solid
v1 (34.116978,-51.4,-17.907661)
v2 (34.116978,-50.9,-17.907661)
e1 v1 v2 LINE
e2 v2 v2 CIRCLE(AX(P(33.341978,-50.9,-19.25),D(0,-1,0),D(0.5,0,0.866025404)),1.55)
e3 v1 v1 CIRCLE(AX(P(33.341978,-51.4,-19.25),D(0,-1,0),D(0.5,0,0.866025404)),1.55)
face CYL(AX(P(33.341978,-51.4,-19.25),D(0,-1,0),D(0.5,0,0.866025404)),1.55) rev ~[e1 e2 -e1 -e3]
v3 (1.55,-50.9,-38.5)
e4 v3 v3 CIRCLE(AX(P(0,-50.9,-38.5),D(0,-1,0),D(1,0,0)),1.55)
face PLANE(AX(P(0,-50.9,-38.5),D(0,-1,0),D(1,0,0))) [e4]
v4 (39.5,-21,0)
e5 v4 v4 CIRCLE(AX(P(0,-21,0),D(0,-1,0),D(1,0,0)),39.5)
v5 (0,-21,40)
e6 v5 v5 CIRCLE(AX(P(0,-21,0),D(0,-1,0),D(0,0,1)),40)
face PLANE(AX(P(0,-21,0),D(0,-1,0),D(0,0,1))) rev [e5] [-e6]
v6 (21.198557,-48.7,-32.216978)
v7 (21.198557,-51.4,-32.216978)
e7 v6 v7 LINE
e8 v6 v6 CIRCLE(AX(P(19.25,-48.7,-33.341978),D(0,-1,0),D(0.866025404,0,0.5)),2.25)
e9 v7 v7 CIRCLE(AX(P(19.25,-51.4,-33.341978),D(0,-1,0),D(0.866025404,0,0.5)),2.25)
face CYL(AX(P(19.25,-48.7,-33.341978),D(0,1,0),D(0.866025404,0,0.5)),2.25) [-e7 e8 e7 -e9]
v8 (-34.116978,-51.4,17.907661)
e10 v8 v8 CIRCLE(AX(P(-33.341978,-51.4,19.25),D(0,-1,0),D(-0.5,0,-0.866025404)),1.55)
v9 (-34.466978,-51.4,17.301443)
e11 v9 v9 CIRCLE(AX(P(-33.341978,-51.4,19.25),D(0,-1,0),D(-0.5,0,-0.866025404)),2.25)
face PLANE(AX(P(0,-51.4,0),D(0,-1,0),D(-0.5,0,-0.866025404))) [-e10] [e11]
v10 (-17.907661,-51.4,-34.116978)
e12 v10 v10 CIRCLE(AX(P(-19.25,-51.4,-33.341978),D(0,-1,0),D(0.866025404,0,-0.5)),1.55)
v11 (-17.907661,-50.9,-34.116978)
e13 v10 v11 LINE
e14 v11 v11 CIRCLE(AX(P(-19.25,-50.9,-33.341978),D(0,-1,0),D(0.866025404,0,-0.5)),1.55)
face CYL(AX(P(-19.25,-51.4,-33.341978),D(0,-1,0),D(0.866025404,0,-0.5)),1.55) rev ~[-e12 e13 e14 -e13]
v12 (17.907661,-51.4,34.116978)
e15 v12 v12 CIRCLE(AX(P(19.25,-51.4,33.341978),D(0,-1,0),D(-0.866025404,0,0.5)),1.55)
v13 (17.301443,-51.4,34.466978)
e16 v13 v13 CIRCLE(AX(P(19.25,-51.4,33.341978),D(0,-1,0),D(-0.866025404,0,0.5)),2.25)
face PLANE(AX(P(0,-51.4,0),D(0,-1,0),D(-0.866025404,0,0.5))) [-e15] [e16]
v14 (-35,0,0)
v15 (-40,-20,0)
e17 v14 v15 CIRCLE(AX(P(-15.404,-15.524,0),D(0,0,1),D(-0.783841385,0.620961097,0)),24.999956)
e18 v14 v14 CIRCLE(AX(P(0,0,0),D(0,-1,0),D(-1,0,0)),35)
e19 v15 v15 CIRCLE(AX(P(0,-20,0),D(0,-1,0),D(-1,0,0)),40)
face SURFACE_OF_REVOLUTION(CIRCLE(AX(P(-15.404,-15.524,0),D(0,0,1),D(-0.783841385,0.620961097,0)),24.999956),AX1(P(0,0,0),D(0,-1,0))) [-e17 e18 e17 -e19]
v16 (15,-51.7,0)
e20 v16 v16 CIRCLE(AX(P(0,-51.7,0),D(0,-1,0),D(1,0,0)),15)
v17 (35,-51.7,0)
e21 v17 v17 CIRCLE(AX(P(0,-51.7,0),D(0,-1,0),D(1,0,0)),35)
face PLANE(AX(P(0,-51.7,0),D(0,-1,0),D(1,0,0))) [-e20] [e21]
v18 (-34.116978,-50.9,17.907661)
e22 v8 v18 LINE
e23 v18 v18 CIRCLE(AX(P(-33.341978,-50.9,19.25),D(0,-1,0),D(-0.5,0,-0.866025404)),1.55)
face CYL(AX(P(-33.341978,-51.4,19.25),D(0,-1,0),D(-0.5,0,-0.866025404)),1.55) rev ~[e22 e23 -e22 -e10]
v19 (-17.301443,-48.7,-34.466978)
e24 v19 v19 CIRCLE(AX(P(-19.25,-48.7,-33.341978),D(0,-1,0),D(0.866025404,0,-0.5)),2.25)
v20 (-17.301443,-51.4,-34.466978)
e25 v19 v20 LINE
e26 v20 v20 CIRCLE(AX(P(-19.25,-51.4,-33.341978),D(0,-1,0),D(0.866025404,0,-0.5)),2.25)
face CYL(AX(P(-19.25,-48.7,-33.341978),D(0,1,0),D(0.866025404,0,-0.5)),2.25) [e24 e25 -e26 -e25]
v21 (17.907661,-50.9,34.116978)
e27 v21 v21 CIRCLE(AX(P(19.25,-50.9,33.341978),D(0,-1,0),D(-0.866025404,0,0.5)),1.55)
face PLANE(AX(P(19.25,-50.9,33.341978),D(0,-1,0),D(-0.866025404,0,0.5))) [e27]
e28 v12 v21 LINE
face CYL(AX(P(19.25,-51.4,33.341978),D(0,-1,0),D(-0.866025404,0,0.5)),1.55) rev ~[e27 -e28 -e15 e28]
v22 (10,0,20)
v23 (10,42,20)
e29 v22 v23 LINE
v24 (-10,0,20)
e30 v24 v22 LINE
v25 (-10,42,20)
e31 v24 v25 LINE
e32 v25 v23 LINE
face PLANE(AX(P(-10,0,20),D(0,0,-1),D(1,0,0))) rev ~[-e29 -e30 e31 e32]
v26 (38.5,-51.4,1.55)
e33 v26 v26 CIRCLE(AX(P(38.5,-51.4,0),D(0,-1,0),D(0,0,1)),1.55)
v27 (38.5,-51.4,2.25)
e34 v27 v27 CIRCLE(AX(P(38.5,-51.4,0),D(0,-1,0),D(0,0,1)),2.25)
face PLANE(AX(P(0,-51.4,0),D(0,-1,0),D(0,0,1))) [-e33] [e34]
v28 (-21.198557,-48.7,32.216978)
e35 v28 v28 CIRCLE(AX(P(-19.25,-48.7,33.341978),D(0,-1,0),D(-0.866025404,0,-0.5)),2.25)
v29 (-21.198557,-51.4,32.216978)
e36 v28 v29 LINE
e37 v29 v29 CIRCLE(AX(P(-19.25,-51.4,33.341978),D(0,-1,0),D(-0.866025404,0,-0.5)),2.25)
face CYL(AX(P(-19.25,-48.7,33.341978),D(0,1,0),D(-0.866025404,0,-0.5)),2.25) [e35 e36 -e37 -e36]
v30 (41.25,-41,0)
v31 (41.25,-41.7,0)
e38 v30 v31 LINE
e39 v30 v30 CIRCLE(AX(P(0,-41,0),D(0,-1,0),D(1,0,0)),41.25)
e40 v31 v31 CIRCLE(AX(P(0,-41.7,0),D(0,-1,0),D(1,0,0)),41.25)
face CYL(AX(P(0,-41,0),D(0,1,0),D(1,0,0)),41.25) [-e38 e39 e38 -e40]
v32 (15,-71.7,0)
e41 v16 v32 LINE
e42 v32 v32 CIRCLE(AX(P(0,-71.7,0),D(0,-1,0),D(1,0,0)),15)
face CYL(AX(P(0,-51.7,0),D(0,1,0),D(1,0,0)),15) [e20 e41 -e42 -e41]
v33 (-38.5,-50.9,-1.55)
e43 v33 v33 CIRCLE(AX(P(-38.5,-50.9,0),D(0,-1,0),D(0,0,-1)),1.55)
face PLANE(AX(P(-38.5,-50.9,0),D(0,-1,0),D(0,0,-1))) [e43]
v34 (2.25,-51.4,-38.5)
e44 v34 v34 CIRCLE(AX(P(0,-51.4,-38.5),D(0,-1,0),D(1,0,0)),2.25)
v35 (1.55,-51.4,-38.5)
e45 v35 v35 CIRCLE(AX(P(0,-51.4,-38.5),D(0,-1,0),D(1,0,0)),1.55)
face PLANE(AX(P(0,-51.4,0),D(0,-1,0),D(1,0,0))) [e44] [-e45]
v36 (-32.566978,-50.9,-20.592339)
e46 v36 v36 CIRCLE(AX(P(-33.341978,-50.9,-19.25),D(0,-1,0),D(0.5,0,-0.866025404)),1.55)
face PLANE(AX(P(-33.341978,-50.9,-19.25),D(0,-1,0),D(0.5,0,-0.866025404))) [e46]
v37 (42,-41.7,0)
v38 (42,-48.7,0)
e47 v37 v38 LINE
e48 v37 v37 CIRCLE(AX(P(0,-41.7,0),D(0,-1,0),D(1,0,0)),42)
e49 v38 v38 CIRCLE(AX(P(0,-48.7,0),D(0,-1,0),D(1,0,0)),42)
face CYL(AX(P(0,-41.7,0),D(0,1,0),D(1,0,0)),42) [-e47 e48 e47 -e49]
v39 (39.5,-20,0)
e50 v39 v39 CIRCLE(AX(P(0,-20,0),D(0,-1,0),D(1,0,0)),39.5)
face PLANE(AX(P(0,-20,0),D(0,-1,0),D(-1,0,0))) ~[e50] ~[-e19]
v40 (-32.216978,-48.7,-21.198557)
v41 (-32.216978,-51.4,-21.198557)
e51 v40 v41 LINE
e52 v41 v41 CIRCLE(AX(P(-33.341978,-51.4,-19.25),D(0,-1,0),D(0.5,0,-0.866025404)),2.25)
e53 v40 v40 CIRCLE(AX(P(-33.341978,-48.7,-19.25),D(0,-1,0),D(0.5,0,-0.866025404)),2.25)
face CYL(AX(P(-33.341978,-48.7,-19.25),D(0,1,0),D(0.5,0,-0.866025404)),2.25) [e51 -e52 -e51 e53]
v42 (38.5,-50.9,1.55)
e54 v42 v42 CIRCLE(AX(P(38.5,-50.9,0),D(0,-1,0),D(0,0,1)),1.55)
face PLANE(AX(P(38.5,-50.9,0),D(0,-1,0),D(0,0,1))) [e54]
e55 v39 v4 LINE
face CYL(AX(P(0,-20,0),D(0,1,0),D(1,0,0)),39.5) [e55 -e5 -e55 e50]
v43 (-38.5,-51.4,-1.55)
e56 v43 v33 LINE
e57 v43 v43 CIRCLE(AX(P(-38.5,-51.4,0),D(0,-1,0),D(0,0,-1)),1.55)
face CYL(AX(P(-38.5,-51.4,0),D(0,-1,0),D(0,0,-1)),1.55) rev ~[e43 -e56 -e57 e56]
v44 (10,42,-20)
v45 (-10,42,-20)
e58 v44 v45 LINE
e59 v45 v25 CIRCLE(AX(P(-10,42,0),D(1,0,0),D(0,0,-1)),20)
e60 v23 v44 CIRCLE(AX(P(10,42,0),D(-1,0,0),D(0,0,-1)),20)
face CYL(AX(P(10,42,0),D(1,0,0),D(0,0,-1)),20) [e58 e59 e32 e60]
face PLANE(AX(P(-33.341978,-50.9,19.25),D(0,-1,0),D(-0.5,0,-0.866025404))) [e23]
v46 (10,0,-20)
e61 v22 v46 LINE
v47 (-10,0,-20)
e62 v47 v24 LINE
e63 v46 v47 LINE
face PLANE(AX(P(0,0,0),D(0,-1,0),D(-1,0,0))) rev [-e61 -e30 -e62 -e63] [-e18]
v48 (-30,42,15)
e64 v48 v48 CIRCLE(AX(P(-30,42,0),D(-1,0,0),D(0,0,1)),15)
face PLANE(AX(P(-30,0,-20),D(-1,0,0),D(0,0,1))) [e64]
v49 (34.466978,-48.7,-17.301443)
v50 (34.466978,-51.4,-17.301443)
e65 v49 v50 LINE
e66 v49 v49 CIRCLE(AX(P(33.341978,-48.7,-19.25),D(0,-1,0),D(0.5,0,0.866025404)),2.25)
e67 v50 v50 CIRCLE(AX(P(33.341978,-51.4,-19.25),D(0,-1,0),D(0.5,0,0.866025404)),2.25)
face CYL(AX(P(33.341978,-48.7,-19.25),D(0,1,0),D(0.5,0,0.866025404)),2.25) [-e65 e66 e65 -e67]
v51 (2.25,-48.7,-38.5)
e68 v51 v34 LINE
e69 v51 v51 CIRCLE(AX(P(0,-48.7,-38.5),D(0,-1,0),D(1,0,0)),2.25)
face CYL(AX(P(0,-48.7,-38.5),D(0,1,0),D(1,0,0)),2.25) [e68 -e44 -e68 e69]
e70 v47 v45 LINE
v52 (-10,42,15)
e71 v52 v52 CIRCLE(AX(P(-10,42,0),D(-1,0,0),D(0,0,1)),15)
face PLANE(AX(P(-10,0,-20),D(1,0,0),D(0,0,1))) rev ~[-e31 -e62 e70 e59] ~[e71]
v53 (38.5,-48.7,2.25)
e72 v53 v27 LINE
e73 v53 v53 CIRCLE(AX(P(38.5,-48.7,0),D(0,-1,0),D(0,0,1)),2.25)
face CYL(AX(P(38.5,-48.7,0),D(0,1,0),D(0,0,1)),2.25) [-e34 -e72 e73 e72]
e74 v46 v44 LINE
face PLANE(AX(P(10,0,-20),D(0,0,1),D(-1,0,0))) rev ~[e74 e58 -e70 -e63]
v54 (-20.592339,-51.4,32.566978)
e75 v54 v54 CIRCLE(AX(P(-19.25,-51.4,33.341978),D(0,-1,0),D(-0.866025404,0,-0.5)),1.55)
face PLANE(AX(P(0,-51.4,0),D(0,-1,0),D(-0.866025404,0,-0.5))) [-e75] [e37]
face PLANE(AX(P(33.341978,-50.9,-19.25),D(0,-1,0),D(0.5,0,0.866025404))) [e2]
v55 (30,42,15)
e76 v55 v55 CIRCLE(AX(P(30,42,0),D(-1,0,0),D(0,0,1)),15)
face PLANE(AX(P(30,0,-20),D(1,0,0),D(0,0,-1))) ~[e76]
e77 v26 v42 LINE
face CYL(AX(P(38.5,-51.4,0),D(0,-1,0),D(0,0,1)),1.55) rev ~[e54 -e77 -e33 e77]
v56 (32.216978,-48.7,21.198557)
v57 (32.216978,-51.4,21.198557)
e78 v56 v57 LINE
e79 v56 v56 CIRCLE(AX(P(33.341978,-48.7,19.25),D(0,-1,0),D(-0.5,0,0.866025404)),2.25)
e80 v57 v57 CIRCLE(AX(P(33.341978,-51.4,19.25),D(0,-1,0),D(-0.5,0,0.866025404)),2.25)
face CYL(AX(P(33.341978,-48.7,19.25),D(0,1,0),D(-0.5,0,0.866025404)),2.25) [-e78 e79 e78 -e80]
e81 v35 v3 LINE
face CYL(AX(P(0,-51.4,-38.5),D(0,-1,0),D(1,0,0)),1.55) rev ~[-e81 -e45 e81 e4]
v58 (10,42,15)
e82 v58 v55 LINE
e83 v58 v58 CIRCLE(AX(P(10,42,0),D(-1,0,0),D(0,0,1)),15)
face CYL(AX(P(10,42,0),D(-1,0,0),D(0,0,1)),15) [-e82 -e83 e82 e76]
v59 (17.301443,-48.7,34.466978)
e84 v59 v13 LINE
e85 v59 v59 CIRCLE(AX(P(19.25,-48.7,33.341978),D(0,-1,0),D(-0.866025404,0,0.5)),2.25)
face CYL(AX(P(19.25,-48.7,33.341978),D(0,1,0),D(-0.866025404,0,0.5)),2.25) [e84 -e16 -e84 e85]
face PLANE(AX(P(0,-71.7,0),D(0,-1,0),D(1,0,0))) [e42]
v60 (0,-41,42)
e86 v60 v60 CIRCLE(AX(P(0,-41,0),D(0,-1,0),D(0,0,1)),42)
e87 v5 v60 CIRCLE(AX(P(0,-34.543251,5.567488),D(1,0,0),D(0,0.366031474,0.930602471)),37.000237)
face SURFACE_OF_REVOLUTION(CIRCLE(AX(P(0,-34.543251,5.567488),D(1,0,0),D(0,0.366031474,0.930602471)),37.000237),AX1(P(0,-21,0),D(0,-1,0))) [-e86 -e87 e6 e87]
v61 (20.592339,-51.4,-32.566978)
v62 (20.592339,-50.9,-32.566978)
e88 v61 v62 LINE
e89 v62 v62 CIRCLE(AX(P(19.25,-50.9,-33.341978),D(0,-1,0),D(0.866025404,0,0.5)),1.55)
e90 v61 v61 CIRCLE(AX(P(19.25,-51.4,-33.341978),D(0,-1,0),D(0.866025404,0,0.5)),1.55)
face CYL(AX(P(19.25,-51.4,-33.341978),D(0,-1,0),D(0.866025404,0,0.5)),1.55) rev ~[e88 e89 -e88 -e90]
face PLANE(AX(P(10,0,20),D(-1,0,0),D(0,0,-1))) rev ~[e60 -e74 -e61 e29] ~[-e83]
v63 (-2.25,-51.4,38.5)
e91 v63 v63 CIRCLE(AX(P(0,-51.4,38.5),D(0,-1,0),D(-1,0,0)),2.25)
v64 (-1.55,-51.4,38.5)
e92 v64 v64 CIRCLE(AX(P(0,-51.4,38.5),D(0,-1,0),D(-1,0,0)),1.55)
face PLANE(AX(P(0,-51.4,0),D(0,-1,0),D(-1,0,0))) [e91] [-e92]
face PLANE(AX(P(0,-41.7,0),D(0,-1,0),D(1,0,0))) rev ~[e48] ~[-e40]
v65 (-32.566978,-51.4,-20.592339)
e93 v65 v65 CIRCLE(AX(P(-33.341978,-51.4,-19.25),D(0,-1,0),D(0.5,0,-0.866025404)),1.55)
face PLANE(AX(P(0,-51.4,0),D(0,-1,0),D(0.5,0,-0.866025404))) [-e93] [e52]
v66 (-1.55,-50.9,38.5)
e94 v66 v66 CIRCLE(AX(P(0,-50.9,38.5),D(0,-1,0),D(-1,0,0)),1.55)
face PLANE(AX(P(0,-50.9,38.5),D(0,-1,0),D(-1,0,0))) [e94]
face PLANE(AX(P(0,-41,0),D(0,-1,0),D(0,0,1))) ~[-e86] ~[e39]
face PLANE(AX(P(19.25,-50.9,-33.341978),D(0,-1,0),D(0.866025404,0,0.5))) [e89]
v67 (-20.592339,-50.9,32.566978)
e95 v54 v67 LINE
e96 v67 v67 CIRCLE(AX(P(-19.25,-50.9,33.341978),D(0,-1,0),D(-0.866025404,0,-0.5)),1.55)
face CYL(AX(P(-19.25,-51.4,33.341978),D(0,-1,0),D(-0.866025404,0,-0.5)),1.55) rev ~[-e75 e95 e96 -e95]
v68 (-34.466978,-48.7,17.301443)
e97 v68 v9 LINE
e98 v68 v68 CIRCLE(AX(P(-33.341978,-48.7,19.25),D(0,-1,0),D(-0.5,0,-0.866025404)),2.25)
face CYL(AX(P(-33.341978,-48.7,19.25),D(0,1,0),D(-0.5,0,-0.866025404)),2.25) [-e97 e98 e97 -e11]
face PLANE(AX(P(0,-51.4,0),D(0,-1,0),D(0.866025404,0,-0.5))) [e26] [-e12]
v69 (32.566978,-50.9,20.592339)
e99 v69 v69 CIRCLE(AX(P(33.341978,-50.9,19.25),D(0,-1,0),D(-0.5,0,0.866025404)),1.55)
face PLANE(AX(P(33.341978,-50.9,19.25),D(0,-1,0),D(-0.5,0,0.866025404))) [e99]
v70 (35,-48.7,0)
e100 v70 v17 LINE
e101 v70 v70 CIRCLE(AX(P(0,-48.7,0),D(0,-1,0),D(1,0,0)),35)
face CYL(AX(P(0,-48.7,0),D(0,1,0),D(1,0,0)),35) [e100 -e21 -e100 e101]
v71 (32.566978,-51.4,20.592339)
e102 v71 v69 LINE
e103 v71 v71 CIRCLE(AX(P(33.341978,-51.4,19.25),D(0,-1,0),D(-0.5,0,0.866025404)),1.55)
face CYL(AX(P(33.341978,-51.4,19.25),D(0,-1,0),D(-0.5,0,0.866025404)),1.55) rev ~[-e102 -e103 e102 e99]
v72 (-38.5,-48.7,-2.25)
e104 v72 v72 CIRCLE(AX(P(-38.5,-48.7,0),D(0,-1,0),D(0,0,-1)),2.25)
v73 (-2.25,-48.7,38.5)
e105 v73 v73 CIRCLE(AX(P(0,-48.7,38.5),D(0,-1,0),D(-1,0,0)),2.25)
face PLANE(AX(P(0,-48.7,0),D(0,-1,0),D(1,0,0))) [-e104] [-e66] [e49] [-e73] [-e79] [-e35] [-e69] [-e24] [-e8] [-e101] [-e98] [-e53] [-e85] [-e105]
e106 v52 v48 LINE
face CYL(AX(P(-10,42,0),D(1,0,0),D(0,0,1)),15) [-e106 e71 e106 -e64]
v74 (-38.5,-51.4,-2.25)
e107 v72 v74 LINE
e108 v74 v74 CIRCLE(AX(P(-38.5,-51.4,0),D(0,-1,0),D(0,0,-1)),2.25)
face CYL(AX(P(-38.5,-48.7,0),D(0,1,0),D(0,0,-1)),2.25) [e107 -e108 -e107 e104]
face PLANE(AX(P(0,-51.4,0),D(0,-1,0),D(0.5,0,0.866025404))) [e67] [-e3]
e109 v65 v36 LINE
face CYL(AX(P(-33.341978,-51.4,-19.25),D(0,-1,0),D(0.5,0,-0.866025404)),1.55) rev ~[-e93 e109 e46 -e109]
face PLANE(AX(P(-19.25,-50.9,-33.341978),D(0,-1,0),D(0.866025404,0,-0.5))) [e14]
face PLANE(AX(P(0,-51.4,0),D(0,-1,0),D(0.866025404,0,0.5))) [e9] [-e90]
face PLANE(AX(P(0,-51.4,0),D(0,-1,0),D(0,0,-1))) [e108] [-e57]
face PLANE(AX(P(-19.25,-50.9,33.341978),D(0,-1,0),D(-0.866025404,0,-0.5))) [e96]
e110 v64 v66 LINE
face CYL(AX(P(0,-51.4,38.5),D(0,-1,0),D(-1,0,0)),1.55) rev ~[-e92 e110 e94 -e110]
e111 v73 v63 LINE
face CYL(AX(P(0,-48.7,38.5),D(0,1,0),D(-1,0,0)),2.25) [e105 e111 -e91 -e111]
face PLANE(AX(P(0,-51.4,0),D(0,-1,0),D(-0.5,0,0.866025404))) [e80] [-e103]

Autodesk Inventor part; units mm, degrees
ref_plane "YZ Plane" through (0, 0, 0) normal (1, 0, 0) x (0, 1, 0)
ref_plane "XZ Plane" through (0, 0, 0) normal (0, 1, 0) x (-1, 0, 0)
ref_plane "XY Plane" through (0, 0, 0) normal (0, 0, 1) x (1, 0, 0)
sketch "Sketch1" plane through (0, 0, 0) normal (0, 0, 1) x (1, 0, 0)
  line L0 (0, 0) -> (-35, 0)
  line L1 (0, 0) -> (0, -20)
  line L2 (0, -20) -> (-40, -20)
  arc A0 (-35, 0) -> (-40, -20) centre (-15.404, -15.524) ccw
  dimension "d0" = 35
  dimension "d1" = 20
  dimension "d2" = 40
  dimension "d3" = 25
revolve "Revolution1" add sketch "Sketch1" angle 360 about axis through (0, 0, 0) along (0, -1, 0)
sketch "Sketch2" plane through (0, -20, 0) normal (0, -1, 0) x (1, 0, 0)
  circle A0 centre (0, 0) radius 39.5
  dimension "d5" = 79
extrude "Extrusion1" add sketch "Sketch2" along normal blind 1
sketch "Sketch3" plane through (0, 0, 0) normal (1, 0, 0) x (0, 1, 0)
  line L0 (-21, 39.5) -> (-21, -39.5) projected
  line L1 (-21, 0) -> (-21, 40)
  line L2 (-21, 0) -> (-41, 0)
  line L3 (-41, 0) -> (-41, 42)
  arc A0 (-21, 40) -> (-41, 42) centre (-34.5432, 5.5677) ccw
  point P0 (0, 0)
  dimension "d8" = 40
  dimension "d9" = 20
  dimension "d10" = 42
  dimension "d11" = 37
revolve "Revolution2" add sketch "Sketch3" angle 360 about axis through (0, -21, 0) along (0, -1, 0)
sketch "Sketch4" plane through (0, -41, 0) normal (0, -1, 0) x (1, 0, 0)
  circle A0 centre (0, 0) radius 41.25
  dimension "d13" = 82.5
extrude "Extrusion2" add sketch "Sketch4" along normal blind 0.7
sketch "Sketch5" plane through (0, -41.7, 0) normal (0, -1, 0) x (1, 0, 0)
  circle A0 centre (0, 0) radius 42
  dimension "d16" = 84
extrude "Extrusion3" add sketch "Sketch5" along normal blind 7
sketch "Sketch6" plane through (0, -48.7, 0) normal (0, -1, 0) x (1, 0, 0)
  circle A0 centre (0, 0) radius 35
  dimension "d19" = 70
extrude "Extrusion4" add sketch "Sketch6" along normal blind 3
sketch "Sketch7" plane through (0, -48.7, 0) normal (0, -1, 0) x (1, 0, 0)
  circle A0 centre (0, 0) radius 35 construction
  line L0 (0, -35) -> (0, -42) construction
  circle A1 centre (0, 0) radius 42 construction
  circle A2 centre (0, -38.5) radius 2.25
  dimension "d22" = 4.5
extrude "Extrusion5" add sketch "Sketch7" along normal blind 2.7
sketch "Sketch8" plane through (0, -51.4, -38.5) normal (0, -1, 0) x (1, 0, 0)
  circle A0 centre (0, 0) radius 2.25 projected
  circle A1 centre (0, 0) radius 1.55
  point P0 (0, 38.5)
  dimension "d25" = 0.7
extrude "Extrusion6" cut sketch "Sketch8" against normal blind 0.5 contours A1
pattern_circular "Circular Pattern1" count 12 over 360 about axis through (0, -48.7, 0) along (0, -1, 0) of "Extrusion5", "Extrusion6"
sketch "Sketch9" plane through (0, 0, 0) normal (0, 1, 0) x (1, 0, 0)
  line L0 (-10, -20) -> (10, -20)
  line L1 (10, -20) -> (10, 20)
  line L2 (10, 20) -> (-10, 20)
  line L3 (-10, 20) -> (-10, -20)
  line L4 (-10, -20) -> (10, 20) construction
  line L5 (10, -20) -> (-10, 20) construction
  point P0 (0, 0)
  dimension "d31" = 20
  dimension "d32" = 40
extrude "Extrusion7" add sketch "Sketch9" along normal blind 42
sketch "Sketch10" plane through (10, 0, 20) normal (1, 0, 0) x (0, 0, -1)
  line L0 (0, 42) -> (40, 42) projected
  circle A0 centre (20, 42) radius 20
  point P0 (20, 0)
extrude "Extrusion8" add sketch "Sketch10" against normal up to surface (20 mm away)
sketch "Sketch11" plane through (-10, 0, -20) normal (-1, 0, 0) x (0, 0, 1)
  arc A0 (40, 42) -> (0, 42) centre (20, 42) ccw projected
  circle A1 centre (20, 42) radius 15
  point P0 (20, 0)
  dimension "d37" = 30
extrude "Extrusion9" add sketch "Sketch11" along normal blind 20
mirror "Mirror1" about plane through (0, 0, 0) normal (1, 0, 0) of "Extrusion9"
sketch "Sketch12" plane through (0, -51.7, 0) normal (0, -1, 0) x (1, 0, 0)
  circle A0 centre (0, 0) radius 15
  dimension "d40" = 30
extrude "Extrusion10" add sketch "Sketch12" along normal blind 20
